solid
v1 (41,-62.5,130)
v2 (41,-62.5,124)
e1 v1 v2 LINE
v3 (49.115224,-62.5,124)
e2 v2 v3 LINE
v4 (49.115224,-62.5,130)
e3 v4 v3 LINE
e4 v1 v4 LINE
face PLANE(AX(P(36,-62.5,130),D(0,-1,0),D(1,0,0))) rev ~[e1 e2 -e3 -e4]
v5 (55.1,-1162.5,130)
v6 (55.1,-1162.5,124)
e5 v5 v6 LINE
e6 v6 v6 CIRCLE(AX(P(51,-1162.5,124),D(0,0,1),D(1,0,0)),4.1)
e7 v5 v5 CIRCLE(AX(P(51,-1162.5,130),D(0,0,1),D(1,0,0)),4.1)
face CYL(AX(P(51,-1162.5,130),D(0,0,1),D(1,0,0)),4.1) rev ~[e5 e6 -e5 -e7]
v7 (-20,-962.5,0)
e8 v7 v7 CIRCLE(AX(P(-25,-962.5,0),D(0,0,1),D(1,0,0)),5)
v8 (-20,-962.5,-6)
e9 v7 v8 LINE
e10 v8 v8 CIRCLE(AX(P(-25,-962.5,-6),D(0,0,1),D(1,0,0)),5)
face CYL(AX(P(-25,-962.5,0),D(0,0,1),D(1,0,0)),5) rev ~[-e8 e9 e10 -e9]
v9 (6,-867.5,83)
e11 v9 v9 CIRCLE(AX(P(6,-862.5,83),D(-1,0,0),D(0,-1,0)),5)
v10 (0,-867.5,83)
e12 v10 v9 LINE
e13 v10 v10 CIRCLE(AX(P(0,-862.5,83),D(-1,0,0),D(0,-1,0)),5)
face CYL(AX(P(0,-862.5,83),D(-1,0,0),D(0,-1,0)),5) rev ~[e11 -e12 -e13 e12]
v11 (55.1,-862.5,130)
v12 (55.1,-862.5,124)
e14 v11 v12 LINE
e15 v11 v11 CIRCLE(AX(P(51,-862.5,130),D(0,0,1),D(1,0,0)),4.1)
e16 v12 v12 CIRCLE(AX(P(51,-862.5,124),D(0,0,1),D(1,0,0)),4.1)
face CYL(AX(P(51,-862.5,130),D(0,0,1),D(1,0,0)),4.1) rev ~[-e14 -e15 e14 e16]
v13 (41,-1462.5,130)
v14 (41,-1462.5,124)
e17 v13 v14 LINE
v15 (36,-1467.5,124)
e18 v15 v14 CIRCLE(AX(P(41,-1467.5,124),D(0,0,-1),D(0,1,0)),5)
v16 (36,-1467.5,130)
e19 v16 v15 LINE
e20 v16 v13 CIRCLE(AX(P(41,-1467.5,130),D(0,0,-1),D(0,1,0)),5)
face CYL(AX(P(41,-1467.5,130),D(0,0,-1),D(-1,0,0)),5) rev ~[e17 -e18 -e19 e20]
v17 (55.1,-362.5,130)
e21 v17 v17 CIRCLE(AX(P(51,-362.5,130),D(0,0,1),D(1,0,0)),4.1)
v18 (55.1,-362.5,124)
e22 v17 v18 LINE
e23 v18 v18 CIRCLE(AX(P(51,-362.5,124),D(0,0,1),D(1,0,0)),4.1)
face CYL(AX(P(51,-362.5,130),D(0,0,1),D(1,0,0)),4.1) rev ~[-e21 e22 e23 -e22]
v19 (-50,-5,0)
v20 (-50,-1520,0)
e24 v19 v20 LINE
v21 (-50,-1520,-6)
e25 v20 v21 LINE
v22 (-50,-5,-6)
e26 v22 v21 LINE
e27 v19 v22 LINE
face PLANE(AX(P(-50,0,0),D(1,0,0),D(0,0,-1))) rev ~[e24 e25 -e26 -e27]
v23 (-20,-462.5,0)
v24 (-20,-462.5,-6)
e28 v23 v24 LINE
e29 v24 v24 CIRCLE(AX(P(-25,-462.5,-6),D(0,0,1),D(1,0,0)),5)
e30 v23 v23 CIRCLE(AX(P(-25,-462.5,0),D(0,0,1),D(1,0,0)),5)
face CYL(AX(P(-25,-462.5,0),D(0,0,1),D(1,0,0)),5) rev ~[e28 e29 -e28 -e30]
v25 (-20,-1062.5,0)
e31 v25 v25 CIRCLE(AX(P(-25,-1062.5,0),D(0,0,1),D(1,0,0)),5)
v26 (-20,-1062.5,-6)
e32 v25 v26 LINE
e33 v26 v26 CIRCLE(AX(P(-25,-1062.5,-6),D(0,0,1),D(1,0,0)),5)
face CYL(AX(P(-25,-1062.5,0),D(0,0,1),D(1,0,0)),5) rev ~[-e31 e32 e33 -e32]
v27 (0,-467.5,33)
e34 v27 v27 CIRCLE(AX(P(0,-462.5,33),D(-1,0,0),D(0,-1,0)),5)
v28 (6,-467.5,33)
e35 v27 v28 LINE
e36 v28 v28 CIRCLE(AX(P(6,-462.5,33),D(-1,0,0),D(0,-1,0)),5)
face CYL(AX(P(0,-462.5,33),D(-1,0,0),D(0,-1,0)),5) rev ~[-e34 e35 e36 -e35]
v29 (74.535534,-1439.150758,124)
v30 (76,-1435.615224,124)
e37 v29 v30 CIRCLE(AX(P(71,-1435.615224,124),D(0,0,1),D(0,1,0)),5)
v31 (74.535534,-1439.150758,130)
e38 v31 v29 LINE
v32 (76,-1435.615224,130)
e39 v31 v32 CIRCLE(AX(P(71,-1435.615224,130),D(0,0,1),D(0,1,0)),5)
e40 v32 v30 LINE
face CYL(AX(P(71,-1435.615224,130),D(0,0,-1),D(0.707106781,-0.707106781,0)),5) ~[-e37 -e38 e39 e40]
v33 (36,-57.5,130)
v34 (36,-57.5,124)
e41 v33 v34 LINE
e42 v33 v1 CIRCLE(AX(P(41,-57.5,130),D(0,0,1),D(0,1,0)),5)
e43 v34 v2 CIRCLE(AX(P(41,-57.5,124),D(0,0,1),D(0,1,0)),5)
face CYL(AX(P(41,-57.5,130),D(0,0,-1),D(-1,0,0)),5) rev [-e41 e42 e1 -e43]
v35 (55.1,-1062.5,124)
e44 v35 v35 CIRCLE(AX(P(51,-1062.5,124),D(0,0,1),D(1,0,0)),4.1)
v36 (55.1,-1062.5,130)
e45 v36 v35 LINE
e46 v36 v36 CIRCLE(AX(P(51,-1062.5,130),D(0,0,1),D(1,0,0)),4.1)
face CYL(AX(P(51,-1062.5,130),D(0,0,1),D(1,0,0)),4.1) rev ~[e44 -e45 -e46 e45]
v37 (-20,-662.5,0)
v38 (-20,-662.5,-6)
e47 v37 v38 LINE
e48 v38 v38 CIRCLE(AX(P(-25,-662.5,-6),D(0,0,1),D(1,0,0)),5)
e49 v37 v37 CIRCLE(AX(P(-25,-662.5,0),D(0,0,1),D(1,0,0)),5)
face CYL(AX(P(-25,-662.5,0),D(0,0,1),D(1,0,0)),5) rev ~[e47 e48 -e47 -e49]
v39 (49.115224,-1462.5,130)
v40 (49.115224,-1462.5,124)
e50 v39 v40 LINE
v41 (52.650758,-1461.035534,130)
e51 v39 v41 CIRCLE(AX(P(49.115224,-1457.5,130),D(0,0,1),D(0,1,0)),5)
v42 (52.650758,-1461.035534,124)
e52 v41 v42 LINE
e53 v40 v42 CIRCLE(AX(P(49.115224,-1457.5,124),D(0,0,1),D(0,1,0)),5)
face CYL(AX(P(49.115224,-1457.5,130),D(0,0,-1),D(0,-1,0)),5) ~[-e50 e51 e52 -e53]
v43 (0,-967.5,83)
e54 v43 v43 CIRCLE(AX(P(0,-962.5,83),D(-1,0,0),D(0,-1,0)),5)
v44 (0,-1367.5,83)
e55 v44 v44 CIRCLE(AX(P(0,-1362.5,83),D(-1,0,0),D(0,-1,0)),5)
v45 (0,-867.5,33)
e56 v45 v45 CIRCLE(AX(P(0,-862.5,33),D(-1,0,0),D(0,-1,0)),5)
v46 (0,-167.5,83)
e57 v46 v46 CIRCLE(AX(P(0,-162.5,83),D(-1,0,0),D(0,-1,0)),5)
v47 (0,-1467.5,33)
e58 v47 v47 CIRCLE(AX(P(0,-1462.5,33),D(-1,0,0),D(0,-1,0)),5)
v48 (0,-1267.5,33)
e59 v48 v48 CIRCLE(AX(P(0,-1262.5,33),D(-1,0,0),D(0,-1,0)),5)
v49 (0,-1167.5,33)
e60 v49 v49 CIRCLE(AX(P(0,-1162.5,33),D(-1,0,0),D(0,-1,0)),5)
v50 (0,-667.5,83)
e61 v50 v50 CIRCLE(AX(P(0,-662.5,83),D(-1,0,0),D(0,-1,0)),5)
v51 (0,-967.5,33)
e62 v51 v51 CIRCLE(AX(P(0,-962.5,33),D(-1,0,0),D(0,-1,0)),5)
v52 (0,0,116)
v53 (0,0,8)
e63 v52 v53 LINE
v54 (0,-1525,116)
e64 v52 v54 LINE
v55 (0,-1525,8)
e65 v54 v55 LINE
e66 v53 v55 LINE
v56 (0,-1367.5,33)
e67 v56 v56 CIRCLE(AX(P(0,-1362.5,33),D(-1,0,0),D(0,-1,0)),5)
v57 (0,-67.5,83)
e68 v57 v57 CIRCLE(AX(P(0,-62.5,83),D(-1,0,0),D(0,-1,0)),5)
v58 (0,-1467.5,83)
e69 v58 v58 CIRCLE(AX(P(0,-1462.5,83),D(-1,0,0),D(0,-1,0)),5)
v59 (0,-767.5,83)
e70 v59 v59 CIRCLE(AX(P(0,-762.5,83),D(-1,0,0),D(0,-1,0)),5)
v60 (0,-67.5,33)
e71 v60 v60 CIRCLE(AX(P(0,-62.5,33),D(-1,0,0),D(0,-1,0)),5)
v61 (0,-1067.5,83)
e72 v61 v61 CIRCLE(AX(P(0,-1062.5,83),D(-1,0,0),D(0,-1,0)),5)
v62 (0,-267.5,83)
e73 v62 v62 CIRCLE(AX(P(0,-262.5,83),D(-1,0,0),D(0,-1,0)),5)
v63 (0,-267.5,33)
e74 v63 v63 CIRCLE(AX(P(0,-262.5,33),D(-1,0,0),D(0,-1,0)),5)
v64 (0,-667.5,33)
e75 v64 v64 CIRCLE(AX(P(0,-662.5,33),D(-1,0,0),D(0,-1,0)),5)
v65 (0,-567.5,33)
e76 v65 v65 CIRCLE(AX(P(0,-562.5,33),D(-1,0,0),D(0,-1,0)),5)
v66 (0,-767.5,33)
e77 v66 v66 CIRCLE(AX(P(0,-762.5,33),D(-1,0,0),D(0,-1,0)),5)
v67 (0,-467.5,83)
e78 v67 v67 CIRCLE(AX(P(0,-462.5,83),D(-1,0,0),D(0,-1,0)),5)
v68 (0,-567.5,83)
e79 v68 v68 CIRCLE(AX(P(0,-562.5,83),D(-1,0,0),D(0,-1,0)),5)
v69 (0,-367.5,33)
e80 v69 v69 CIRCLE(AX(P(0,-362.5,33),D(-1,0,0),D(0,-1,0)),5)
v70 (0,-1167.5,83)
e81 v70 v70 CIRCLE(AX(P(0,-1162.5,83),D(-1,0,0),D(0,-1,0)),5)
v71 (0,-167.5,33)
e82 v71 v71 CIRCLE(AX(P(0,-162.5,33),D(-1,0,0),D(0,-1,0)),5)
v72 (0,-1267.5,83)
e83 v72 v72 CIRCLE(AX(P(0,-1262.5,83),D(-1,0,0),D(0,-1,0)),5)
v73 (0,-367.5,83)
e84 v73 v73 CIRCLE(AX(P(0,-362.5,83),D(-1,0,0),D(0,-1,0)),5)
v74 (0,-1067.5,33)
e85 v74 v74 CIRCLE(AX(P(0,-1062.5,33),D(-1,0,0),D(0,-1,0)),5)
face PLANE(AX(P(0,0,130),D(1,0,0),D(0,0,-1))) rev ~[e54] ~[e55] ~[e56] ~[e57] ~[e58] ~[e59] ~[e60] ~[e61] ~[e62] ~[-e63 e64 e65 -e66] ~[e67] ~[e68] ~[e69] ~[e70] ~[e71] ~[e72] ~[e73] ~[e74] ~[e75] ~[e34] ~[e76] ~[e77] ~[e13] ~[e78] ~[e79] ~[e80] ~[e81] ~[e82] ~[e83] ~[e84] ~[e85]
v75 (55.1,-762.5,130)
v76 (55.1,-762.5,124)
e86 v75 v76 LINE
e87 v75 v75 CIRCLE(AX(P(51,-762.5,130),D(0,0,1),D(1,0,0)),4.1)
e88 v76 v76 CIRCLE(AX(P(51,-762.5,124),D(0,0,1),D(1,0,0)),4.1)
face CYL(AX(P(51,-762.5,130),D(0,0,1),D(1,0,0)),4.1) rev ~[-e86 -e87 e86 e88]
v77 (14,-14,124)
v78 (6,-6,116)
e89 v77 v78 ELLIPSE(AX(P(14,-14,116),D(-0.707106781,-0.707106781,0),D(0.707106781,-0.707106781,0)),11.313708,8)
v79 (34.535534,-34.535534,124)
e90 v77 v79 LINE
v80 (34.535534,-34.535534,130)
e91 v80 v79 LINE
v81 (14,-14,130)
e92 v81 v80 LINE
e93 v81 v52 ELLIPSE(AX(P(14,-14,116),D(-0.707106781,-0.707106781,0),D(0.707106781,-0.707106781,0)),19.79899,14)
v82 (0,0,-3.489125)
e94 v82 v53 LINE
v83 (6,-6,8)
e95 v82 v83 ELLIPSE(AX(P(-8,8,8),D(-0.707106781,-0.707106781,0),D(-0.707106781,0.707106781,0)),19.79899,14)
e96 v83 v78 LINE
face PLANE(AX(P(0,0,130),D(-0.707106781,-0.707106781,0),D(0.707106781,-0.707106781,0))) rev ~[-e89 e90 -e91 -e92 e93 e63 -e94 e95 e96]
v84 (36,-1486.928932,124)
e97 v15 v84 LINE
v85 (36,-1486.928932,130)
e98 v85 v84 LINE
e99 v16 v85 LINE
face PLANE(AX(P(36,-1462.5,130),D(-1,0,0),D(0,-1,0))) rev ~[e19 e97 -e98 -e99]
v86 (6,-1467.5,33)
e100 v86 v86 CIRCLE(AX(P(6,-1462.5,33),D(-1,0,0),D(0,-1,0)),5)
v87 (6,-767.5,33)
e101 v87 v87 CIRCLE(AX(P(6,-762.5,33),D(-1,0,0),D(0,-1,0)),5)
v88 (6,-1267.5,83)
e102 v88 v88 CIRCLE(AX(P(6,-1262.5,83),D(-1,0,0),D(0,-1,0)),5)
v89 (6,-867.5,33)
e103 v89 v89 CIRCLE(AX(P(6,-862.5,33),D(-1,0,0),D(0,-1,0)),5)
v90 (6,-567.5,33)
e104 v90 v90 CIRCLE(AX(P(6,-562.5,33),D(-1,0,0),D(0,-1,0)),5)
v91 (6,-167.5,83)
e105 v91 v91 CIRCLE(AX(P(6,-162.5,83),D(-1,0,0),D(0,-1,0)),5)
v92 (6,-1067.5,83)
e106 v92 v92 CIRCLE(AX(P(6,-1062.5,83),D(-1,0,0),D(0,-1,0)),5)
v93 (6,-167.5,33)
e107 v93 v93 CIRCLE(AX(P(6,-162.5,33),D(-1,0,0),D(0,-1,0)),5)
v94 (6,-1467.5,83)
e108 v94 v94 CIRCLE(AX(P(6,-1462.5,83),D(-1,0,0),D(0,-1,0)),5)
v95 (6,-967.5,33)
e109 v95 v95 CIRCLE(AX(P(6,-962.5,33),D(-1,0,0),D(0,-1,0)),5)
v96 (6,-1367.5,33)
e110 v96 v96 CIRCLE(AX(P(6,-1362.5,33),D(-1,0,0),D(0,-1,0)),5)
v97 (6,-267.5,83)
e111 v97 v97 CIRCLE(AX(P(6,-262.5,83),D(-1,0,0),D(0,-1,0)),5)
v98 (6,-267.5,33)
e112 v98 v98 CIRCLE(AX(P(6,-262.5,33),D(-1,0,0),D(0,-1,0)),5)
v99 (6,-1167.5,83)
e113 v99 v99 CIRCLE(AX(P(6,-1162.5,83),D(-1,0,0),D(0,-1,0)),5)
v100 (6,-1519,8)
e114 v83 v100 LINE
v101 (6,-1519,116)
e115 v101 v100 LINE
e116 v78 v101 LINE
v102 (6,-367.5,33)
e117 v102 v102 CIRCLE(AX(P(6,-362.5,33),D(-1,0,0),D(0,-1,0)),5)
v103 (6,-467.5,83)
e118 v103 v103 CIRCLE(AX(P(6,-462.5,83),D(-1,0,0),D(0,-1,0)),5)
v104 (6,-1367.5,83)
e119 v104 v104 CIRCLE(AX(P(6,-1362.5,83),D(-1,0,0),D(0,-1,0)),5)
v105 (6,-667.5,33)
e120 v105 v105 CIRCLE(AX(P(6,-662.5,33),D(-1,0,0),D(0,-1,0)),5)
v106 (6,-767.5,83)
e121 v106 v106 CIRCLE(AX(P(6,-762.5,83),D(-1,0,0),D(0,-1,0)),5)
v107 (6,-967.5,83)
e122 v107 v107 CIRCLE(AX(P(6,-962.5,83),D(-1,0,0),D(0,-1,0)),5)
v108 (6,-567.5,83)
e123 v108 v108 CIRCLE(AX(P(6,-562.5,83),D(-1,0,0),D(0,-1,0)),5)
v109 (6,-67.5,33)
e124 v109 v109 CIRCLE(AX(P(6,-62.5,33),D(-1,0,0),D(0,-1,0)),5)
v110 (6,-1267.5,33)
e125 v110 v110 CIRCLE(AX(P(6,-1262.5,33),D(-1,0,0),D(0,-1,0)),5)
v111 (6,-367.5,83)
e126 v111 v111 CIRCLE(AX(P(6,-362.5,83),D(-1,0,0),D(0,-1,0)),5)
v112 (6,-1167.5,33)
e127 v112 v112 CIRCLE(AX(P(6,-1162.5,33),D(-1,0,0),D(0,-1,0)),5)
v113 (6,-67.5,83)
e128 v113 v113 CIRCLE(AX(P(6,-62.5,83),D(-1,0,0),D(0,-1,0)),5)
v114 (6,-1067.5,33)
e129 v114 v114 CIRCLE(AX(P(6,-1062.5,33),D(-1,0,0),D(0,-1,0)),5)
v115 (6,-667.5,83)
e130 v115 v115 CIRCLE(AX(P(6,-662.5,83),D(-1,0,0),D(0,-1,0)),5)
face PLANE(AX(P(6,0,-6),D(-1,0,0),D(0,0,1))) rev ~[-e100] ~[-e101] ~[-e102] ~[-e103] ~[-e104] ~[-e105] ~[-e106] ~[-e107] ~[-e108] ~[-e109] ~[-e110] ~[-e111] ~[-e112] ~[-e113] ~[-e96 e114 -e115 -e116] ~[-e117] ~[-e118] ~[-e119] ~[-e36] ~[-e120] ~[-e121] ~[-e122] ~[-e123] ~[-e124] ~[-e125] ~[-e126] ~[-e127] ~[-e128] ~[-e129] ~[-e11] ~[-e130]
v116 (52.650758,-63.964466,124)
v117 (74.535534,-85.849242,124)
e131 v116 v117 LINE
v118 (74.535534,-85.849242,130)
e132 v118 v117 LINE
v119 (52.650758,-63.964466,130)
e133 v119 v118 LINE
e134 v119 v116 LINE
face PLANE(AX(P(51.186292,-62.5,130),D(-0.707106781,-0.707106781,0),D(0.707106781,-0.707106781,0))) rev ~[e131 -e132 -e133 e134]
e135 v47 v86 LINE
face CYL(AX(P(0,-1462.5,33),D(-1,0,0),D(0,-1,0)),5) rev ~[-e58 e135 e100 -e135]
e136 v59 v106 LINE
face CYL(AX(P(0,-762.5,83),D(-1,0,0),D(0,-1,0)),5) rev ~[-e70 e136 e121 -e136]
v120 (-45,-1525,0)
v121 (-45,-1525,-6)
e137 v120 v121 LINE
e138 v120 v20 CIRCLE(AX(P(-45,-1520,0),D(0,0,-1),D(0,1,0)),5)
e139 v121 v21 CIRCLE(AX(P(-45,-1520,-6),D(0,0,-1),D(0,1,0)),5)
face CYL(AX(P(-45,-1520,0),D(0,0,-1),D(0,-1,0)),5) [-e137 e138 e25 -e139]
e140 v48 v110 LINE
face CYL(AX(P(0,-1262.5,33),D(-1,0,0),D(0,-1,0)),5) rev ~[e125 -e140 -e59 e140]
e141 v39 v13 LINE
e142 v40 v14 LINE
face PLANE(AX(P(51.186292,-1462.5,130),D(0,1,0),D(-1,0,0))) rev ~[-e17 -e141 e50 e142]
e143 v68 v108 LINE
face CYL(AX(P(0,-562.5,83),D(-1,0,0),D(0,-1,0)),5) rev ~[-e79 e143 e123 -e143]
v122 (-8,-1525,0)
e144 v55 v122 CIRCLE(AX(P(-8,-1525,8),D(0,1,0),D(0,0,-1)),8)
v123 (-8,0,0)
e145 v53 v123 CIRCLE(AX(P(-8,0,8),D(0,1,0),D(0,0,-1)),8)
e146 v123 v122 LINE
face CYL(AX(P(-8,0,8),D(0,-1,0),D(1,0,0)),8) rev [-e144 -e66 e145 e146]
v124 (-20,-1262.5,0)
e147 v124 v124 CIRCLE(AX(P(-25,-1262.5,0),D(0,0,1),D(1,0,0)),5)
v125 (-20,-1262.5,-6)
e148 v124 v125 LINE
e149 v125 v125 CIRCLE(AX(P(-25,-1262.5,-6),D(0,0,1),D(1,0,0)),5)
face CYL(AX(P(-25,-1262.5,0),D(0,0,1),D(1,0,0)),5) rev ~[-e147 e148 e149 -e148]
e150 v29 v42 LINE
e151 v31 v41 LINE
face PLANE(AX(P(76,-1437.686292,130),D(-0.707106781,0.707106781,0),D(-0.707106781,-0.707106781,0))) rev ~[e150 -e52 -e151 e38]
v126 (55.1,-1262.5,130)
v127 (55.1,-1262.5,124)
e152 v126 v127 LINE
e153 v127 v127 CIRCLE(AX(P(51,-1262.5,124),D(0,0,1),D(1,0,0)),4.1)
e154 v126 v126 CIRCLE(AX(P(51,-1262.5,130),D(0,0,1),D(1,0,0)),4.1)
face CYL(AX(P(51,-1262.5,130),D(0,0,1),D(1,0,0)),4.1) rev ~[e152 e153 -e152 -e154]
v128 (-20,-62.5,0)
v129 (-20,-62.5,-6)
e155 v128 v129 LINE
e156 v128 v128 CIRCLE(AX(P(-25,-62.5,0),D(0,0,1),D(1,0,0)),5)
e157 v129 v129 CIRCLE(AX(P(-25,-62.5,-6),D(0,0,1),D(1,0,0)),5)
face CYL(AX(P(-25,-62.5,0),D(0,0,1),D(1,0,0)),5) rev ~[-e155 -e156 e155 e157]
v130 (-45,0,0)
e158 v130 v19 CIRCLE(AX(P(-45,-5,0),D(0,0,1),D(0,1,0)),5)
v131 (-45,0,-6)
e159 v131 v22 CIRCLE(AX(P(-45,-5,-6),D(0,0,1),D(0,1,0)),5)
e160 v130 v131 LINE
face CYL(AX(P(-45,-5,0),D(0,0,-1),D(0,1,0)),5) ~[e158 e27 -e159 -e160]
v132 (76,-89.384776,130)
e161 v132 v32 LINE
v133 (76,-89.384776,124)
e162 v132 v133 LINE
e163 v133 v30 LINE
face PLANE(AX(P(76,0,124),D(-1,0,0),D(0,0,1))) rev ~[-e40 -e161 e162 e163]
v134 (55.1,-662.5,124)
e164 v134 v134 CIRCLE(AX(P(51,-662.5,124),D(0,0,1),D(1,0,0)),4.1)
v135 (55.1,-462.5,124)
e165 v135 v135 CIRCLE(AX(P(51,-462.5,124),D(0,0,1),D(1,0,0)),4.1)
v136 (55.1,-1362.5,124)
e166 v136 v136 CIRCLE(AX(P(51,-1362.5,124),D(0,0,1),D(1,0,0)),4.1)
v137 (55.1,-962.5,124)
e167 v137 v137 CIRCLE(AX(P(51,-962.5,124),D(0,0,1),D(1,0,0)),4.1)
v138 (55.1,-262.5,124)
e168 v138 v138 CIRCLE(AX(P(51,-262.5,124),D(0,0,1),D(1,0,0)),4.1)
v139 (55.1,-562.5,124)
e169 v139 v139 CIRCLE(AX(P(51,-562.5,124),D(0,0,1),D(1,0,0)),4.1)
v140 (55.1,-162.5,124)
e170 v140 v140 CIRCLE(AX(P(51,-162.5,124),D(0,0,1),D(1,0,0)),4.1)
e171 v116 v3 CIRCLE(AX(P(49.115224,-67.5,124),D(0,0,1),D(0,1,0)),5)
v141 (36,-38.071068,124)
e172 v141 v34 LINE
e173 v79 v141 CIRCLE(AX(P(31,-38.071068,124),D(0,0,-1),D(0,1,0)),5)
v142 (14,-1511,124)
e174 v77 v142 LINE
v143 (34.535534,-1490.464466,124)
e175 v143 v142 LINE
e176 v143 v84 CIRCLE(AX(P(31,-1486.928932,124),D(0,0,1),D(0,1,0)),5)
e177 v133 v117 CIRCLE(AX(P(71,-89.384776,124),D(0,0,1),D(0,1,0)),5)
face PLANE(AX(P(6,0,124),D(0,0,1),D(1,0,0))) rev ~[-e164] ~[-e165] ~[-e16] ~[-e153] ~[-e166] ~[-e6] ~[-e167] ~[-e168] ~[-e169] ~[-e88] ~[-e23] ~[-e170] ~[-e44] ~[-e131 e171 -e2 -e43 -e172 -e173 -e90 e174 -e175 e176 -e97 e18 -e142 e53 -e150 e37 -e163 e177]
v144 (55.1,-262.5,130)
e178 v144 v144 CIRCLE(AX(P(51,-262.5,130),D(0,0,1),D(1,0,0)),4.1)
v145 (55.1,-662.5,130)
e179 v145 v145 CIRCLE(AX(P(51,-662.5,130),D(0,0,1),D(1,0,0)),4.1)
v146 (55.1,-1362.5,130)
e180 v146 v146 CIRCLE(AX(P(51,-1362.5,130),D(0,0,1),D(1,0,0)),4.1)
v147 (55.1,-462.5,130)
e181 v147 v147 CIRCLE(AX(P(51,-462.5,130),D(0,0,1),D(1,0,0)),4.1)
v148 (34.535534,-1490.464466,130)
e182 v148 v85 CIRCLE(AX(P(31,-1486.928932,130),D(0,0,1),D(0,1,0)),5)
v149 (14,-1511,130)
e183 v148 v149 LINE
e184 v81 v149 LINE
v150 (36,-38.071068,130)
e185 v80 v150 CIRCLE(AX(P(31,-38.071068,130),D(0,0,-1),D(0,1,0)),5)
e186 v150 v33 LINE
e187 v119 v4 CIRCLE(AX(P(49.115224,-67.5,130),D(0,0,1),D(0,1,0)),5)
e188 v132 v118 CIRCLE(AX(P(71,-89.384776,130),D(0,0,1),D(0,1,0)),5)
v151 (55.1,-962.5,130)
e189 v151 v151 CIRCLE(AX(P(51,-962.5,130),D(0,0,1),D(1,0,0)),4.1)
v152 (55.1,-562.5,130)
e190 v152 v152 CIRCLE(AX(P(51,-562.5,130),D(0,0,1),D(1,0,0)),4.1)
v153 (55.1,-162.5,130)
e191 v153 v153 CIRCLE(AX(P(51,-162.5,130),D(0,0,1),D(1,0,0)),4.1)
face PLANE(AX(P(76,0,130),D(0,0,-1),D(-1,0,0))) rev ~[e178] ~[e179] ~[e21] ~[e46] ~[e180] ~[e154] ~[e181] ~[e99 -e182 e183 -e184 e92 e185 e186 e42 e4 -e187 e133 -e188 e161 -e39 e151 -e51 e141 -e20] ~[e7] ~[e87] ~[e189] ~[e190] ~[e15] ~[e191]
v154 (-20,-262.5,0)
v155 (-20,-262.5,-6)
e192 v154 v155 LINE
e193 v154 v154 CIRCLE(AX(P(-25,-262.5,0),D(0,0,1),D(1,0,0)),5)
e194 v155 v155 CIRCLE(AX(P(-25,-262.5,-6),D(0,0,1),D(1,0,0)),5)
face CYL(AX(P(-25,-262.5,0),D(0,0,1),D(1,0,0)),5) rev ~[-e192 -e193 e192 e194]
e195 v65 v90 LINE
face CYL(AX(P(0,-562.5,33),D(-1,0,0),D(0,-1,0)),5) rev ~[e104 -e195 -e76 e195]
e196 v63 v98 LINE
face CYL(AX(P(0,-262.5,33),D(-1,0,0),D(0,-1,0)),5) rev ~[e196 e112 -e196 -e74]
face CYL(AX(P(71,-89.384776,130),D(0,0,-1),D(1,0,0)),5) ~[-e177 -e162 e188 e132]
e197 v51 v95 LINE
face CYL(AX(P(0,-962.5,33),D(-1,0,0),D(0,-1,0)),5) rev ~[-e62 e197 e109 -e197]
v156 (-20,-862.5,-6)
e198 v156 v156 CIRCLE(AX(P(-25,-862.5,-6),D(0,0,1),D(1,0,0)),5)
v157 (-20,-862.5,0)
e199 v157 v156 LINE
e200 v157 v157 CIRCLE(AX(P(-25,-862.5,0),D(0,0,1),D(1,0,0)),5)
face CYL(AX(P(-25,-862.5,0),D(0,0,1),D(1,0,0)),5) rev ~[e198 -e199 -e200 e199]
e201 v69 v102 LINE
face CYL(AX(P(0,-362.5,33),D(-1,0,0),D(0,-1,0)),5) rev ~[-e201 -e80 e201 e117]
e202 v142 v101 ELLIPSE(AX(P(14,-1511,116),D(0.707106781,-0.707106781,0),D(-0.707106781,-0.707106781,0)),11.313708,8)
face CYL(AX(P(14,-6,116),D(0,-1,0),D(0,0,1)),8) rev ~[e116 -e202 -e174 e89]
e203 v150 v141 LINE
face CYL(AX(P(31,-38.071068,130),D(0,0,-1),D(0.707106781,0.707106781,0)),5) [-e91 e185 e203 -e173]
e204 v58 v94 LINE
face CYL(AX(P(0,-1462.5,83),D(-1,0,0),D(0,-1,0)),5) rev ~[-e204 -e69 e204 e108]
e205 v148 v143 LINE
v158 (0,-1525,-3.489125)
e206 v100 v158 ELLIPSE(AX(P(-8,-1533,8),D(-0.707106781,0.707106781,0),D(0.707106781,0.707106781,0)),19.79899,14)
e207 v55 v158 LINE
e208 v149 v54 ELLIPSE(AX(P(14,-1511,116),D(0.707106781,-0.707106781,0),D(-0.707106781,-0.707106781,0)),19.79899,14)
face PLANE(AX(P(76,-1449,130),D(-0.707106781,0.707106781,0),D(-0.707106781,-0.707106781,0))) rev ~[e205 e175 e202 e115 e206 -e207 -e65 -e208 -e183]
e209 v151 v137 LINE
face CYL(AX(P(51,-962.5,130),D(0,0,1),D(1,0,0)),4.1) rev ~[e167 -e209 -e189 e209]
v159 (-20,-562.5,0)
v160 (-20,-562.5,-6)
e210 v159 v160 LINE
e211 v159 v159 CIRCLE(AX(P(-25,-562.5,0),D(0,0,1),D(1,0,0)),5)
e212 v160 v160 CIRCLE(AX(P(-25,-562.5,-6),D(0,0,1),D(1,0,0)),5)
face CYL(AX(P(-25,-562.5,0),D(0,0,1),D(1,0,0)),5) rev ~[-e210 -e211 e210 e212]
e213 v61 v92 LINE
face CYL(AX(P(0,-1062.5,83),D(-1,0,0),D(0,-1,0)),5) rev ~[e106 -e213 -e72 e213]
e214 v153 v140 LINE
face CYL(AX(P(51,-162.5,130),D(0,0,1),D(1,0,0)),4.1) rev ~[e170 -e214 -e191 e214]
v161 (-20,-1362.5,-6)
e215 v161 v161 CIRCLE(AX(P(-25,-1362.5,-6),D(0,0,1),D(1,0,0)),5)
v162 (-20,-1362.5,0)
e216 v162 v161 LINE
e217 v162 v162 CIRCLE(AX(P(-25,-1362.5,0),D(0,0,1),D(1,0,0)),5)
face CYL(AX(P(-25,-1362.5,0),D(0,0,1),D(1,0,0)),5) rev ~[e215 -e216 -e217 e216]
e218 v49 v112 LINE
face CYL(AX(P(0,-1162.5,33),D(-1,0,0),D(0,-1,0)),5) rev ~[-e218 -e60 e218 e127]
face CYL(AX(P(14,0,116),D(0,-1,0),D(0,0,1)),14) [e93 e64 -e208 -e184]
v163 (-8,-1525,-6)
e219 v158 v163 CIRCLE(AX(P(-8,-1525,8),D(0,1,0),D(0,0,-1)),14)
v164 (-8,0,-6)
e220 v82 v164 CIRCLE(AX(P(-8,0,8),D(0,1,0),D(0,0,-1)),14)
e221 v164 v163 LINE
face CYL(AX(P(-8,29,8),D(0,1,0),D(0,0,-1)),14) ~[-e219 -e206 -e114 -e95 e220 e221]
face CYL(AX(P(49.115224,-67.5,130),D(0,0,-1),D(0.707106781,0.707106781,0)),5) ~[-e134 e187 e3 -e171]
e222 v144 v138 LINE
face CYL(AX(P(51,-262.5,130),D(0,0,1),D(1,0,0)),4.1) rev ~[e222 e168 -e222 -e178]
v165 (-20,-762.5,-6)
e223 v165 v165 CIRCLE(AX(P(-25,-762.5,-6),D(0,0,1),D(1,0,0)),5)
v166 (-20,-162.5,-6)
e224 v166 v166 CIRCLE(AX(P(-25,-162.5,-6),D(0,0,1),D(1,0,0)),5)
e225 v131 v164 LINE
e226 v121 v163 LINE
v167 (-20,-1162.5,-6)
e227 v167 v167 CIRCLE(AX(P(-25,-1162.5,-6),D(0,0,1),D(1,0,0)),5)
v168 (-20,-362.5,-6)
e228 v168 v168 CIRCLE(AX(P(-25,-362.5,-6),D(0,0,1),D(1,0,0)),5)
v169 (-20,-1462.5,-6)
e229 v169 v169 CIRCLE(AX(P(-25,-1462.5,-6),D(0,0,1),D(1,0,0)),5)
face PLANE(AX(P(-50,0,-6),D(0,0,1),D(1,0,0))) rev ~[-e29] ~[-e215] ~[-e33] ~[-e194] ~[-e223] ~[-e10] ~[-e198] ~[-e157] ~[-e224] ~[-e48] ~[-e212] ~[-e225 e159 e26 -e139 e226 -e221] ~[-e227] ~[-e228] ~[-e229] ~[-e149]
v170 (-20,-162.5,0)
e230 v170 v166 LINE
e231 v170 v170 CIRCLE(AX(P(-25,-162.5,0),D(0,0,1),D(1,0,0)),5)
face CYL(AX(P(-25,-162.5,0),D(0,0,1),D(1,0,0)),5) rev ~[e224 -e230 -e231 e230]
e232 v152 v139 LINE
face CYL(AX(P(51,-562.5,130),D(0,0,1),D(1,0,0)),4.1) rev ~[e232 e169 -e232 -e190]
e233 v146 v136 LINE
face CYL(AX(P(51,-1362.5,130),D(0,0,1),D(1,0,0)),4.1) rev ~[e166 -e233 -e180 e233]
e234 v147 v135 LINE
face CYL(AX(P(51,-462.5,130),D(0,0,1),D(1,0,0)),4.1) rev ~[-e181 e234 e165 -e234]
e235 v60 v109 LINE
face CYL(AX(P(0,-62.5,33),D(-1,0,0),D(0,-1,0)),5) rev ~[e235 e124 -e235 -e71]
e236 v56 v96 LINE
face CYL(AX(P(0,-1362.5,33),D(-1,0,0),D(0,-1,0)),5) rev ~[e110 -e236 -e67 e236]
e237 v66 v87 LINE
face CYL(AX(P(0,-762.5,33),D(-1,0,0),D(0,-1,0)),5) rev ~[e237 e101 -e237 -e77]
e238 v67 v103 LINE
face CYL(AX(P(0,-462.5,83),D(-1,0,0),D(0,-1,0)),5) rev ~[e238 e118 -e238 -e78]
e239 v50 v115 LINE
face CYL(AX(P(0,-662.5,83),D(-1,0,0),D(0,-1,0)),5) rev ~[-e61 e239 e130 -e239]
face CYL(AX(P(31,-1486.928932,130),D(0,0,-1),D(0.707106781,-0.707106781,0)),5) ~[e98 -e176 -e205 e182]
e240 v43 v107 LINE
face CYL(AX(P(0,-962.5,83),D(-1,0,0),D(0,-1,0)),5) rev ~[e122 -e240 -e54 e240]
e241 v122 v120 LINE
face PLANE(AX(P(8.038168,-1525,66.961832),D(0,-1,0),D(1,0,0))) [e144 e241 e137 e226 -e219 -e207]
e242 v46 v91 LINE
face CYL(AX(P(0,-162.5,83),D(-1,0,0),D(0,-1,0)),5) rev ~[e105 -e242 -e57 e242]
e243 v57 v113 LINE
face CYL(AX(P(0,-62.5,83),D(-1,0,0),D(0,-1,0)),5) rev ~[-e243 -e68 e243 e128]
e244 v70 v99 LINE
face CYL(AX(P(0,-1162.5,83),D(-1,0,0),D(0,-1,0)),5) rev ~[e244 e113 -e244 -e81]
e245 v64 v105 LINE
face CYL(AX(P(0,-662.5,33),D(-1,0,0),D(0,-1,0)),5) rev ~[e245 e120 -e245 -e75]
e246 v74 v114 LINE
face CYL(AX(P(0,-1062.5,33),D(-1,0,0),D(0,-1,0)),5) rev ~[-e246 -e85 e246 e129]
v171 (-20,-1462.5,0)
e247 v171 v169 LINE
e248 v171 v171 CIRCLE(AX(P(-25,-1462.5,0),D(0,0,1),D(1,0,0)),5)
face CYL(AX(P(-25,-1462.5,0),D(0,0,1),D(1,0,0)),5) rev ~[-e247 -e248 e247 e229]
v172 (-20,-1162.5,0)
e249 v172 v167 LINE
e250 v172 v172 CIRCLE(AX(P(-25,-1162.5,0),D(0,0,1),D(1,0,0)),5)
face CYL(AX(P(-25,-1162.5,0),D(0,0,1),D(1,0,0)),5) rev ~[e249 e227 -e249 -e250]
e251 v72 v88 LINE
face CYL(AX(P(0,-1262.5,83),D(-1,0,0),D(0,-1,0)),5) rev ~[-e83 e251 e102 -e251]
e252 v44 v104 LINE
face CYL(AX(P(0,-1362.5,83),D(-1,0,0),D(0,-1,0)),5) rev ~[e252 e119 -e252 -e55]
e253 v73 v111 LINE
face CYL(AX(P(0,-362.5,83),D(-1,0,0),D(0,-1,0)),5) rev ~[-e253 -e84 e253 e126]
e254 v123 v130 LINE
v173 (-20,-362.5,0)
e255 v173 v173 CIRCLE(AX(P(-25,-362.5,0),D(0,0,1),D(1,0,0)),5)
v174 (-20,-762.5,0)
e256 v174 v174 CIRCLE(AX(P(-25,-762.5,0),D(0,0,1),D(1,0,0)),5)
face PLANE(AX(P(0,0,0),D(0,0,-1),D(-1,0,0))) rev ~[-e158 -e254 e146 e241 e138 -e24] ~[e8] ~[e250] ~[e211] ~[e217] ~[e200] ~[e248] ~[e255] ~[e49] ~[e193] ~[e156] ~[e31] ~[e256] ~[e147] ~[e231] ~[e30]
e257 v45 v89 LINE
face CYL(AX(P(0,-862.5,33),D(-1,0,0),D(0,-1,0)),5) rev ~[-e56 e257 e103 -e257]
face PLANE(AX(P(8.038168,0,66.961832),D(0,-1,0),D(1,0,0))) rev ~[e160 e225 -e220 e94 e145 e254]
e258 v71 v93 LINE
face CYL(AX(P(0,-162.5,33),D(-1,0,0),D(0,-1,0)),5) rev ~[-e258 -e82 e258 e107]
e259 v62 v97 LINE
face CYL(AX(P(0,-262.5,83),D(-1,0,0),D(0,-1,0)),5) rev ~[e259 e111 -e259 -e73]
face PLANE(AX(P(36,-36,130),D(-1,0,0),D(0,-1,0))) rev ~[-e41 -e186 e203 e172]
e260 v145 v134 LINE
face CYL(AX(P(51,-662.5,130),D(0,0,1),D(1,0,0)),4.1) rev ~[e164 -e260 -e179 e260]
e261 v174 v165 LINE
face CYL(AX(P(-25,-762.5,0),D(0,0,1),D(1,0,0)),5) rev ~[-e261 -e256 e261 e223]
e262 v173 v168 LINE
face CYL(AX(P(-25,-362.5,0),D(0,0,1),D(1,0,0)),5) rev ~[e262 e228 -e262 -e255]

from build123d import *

# Parameters (mm, degrees)
F1_DEPTH    = 1525
F3_DEPTH    = 136.001
F4_R        = 8
F5_R        = 8
F6_R        = 14
F7_T1_DEPTH = 1583
F8_R        = 4.1
F9_DEPTH    = 136.001
F10_R       = 5
F11_DEPTH   = 76.001
F12_R       = 5
F13_DEPTH   = 6.001
F15_DEPTH   = 136.001
F16_R       = 5


# Not quite as in the source:
# - a fillet or chamfer that OpenCascade refuses, or shapes differently, is made with other operations: its cross-section is extruded or revolved along the edge and cut away or added
# - two fillets or chamfers of one size are made in one step


with BuildPart() as f1:
    # F0 (on Front) → F1 (new body)
    with BuildSketch(Plane.XZ):
        Polygon((0, 130), (0, 0), (-50, 0), (-50, -6), (6, -6), (6, 124), (76, 124), (76, 130), align=None)
    extrude(amount=F1_DEPTH)

    # F2 (on face) → F3 (cut, through all)
    with BuildSketch(Plane.XY.offset(130)):
        Polygon((76, -76), (76, 0), (0, 0), align=None)
        Polygon((76, -1525), (76, -1449), (0, -1525), align=None)
    extrude(amount=-F3_DEPTH, mode=Mode.SUBTRACT)

    # F4
    f4_edges = [f1.edges().sort_by_distance(p)[0] for p in [
        (6, -762.5, 124),
    ]]
    fillet(f4_edges, radius=F4_R)

    # F5
    f5_edges = [f1.edges().sort_by_distance(p)[0] for p in [
        (0, -762.5, 0),
    ]]
    fillet(f5_edges, radius=F5_R)

    # F6
    f6_edges = [f1.edges().sort_by_distance(p)[0] for p in [
        (0, -762.5, 130),
    ]]
    fillet(f6_edges, radius=F6_R)

    # F7: fillet of radius 14 on 1 edges, made by hand

    # F7_s2 → F7_t1 (cut)
    with BuildSketch(Plane.XZ.offset(-29)):
        with BuildLine():
            ThreePointArc((-8, -6), (1.8994949366, -1.8994949366), (6, 8))
            Line((6, 8), (6, -6))
            Line((6, -6), (-8, -6))
        make_face()
    extrude(amount=F7_T1_DEPTH, mode=Mode.SUBTRACT)

    # F8 (on face) → F9 (cut, through all)
    with BuildSketch(Plane.XY.offset(130)):
        with Locations((51, -1362.5)):
            Circle(F8_R)
        with Locations((51, -1262.5)):
            Circle(F8_R)
        with Locations((51, -1162.5)):
            Circle(F8_R)
        with Locations((51, -1062.5)):
            Circle(F8_R)
        with Locations((51, -962.5)):
            Circle(F8_R)
        with Locations((51, -862.5)):
            Circle(F8_R)
        with Locations((51, -762.5)):
            Circle(F8_R)
        with Locations((51, -662.5)):
            Circle(F8_R)
        with Locations((51, -562.5)):
            Circle(F8_R)
        with Locations((51, -462.5)):
            Circle(F8_R)
        with Locations((51, -362.5)):
            Circle(F8_R)
        with Locations((51, -262.5)):
            Circle(F8_R)
        with Locations((51, -162.5)):
            Circle(F8_R)
    extrude(amount=-F9_DEPTH, mode=Mode.SUBTRACT)

    # F10 (on face) → F11 (cut, through all)
    with BuildSketch(Plane(origin=(0, 0, 0), x_dir=(0, -1, 0), z_dir=(-1, 0, 0))):
        with Locations((1462.5, 33)):
            Circle(F10_R)
        with Locations((1362.5, 33)):
            Circle(F10_R)
        with Locations((1262.5, 33)):
            Circle(F10_R)
        with Locations((1162.5, 33)):
            Circle(F10_R)
        with Locations((1062.5, 33)):
            Circle(F10_R)
        with Locations((962.5, 33)):
            Circle(F10_R)
        with Locations((862.5, 33)):
            Circle(F10_R)
        with Locations((762.5, 33)):
            Circle(F10_R)
        with Locations((662.5, 33)):
            Circle(F10_R)
        with Locations((562.5, 33)):
            Circle(F10_R)
        with Locations((462.5, 33)):
            Circle(F10_R)
        with Locations((362.5, 33)):
            Circle(F10_R)
        with Locations((262.5, 33)):
            Circle(F10_R)
        with Locations((162.5, 33)):
            Circle(F10_R)
        with Locations((62.5, 33)):
            Circle(F10_R)
        with Locations((1462.5, 83)):
            Circle(F10_R)
        with Locations((1362.5, 83)):
            Circle(F10_R)
        with Locations((1262.5, 83)):
            Circle(F10_R)
        with Locations((1162.5, 83)):
            Circle(F10_R)
        with Locations((1062.5, 83)):
            Circle(F10_R)
        with Locations((962.5, 83)):
            Circle(F10_R)
        with Locations((862.5, 83)):
            Circle(F10_R)
        with Locations((462.5, 83)):
            Circle(F10_R)
        with Locations((562.5, 83)):
            Circle(F10_R)
        with Locations((662.5, 83)):
            Circle(F10_R)
        with Locations((762.5, 83)):
            Circle(F10_R)
        with Locations((162.5, 83)):
            Circle(F10_R)
        with Locations((262.5, 83)):
            Circle(F10_R)
        with Locations((62.5, 83)):
            Circle(F10_R)
        with Locations((362.5, 83)):
            Circle(F10_R)
    extrude(amount=-F11_DEPTH, mode=Mode.SUBTRACT)

    # F12 (on face) → F13 (cut, through all)
    with BuildSketch(Plane.XY):
        with Locations((-25, -1462.5)):
            Circle(F12_R)
        with Locations((-25, -1362.5)):
            Circle(F12_R)
        with Locations((-25, -1262.5)):
            Circle(F12_R)
        with Locations((-25, -1162.5)):
            Circle(F12_R)
        with Locations((-25, -1062.5)):
            Circle(F12_R)
        with Locations((-25, -962.5)):
            Circle(F12_R)
        with Locations((-25, -862.5)):
            Circle(F12_R)
        with Locations((-25, -762.5)):
            Circle(F12_R)
        with Locations((-25, -662.5)):
            Circle(F12_R)
        with Locations((-25, -562.5)):
            Circle(F12_R)
        with Locations((-25, -462.5)):
            Circle(F12_R)
        with Locations((-25, -362.5)):
            Circle(F12_R)
        with Locations((-25, -262.5)):
            Circle(F12_R)
        with Locations((-25, -162.5)):
            Circle(F12_R)
        with Locations((-25, -62.5)):
            Circle(F12_R)
    extrude(amount=-F13_DEPTH, mode=Mode.SUBTRACT)

    # F14 (on face) → F15 (cut, through all)
    with BuildSketch(Plane.XY.offset(130)):
        Polygon((76, -76), (36, -36), (36, -62.5), (51.186291501, -62.5), (76, -87.313708499), align=None)
        Polygon((36, -1462.5), (36, -1489), (76, -1449), (76, -1437.686291501), (51.186291501, -1462.5), align=None)
    extrude(amount=-F15_DEPTH, mode=Mode.SUBTRACT)

    # F16
    f16_edges = [f1.edges().sort_by_distance(p)[0] for p in [
        (36, -36, 127),
        (36, -62.5, 127),
        (36, -1489, 127),
        (36, -1462.5, 127),
        (51.186292, -62.5, 127),
        (76, -87.313708, 127),
        (51.186292, -1462.5, 127),
        (76, -1437.686292, 127),
        (-50, 0, -3),
        (-50, -1525, -3),
    ]]
    fillet(f16_edges, radius=F16_R)


solid = f1.part
